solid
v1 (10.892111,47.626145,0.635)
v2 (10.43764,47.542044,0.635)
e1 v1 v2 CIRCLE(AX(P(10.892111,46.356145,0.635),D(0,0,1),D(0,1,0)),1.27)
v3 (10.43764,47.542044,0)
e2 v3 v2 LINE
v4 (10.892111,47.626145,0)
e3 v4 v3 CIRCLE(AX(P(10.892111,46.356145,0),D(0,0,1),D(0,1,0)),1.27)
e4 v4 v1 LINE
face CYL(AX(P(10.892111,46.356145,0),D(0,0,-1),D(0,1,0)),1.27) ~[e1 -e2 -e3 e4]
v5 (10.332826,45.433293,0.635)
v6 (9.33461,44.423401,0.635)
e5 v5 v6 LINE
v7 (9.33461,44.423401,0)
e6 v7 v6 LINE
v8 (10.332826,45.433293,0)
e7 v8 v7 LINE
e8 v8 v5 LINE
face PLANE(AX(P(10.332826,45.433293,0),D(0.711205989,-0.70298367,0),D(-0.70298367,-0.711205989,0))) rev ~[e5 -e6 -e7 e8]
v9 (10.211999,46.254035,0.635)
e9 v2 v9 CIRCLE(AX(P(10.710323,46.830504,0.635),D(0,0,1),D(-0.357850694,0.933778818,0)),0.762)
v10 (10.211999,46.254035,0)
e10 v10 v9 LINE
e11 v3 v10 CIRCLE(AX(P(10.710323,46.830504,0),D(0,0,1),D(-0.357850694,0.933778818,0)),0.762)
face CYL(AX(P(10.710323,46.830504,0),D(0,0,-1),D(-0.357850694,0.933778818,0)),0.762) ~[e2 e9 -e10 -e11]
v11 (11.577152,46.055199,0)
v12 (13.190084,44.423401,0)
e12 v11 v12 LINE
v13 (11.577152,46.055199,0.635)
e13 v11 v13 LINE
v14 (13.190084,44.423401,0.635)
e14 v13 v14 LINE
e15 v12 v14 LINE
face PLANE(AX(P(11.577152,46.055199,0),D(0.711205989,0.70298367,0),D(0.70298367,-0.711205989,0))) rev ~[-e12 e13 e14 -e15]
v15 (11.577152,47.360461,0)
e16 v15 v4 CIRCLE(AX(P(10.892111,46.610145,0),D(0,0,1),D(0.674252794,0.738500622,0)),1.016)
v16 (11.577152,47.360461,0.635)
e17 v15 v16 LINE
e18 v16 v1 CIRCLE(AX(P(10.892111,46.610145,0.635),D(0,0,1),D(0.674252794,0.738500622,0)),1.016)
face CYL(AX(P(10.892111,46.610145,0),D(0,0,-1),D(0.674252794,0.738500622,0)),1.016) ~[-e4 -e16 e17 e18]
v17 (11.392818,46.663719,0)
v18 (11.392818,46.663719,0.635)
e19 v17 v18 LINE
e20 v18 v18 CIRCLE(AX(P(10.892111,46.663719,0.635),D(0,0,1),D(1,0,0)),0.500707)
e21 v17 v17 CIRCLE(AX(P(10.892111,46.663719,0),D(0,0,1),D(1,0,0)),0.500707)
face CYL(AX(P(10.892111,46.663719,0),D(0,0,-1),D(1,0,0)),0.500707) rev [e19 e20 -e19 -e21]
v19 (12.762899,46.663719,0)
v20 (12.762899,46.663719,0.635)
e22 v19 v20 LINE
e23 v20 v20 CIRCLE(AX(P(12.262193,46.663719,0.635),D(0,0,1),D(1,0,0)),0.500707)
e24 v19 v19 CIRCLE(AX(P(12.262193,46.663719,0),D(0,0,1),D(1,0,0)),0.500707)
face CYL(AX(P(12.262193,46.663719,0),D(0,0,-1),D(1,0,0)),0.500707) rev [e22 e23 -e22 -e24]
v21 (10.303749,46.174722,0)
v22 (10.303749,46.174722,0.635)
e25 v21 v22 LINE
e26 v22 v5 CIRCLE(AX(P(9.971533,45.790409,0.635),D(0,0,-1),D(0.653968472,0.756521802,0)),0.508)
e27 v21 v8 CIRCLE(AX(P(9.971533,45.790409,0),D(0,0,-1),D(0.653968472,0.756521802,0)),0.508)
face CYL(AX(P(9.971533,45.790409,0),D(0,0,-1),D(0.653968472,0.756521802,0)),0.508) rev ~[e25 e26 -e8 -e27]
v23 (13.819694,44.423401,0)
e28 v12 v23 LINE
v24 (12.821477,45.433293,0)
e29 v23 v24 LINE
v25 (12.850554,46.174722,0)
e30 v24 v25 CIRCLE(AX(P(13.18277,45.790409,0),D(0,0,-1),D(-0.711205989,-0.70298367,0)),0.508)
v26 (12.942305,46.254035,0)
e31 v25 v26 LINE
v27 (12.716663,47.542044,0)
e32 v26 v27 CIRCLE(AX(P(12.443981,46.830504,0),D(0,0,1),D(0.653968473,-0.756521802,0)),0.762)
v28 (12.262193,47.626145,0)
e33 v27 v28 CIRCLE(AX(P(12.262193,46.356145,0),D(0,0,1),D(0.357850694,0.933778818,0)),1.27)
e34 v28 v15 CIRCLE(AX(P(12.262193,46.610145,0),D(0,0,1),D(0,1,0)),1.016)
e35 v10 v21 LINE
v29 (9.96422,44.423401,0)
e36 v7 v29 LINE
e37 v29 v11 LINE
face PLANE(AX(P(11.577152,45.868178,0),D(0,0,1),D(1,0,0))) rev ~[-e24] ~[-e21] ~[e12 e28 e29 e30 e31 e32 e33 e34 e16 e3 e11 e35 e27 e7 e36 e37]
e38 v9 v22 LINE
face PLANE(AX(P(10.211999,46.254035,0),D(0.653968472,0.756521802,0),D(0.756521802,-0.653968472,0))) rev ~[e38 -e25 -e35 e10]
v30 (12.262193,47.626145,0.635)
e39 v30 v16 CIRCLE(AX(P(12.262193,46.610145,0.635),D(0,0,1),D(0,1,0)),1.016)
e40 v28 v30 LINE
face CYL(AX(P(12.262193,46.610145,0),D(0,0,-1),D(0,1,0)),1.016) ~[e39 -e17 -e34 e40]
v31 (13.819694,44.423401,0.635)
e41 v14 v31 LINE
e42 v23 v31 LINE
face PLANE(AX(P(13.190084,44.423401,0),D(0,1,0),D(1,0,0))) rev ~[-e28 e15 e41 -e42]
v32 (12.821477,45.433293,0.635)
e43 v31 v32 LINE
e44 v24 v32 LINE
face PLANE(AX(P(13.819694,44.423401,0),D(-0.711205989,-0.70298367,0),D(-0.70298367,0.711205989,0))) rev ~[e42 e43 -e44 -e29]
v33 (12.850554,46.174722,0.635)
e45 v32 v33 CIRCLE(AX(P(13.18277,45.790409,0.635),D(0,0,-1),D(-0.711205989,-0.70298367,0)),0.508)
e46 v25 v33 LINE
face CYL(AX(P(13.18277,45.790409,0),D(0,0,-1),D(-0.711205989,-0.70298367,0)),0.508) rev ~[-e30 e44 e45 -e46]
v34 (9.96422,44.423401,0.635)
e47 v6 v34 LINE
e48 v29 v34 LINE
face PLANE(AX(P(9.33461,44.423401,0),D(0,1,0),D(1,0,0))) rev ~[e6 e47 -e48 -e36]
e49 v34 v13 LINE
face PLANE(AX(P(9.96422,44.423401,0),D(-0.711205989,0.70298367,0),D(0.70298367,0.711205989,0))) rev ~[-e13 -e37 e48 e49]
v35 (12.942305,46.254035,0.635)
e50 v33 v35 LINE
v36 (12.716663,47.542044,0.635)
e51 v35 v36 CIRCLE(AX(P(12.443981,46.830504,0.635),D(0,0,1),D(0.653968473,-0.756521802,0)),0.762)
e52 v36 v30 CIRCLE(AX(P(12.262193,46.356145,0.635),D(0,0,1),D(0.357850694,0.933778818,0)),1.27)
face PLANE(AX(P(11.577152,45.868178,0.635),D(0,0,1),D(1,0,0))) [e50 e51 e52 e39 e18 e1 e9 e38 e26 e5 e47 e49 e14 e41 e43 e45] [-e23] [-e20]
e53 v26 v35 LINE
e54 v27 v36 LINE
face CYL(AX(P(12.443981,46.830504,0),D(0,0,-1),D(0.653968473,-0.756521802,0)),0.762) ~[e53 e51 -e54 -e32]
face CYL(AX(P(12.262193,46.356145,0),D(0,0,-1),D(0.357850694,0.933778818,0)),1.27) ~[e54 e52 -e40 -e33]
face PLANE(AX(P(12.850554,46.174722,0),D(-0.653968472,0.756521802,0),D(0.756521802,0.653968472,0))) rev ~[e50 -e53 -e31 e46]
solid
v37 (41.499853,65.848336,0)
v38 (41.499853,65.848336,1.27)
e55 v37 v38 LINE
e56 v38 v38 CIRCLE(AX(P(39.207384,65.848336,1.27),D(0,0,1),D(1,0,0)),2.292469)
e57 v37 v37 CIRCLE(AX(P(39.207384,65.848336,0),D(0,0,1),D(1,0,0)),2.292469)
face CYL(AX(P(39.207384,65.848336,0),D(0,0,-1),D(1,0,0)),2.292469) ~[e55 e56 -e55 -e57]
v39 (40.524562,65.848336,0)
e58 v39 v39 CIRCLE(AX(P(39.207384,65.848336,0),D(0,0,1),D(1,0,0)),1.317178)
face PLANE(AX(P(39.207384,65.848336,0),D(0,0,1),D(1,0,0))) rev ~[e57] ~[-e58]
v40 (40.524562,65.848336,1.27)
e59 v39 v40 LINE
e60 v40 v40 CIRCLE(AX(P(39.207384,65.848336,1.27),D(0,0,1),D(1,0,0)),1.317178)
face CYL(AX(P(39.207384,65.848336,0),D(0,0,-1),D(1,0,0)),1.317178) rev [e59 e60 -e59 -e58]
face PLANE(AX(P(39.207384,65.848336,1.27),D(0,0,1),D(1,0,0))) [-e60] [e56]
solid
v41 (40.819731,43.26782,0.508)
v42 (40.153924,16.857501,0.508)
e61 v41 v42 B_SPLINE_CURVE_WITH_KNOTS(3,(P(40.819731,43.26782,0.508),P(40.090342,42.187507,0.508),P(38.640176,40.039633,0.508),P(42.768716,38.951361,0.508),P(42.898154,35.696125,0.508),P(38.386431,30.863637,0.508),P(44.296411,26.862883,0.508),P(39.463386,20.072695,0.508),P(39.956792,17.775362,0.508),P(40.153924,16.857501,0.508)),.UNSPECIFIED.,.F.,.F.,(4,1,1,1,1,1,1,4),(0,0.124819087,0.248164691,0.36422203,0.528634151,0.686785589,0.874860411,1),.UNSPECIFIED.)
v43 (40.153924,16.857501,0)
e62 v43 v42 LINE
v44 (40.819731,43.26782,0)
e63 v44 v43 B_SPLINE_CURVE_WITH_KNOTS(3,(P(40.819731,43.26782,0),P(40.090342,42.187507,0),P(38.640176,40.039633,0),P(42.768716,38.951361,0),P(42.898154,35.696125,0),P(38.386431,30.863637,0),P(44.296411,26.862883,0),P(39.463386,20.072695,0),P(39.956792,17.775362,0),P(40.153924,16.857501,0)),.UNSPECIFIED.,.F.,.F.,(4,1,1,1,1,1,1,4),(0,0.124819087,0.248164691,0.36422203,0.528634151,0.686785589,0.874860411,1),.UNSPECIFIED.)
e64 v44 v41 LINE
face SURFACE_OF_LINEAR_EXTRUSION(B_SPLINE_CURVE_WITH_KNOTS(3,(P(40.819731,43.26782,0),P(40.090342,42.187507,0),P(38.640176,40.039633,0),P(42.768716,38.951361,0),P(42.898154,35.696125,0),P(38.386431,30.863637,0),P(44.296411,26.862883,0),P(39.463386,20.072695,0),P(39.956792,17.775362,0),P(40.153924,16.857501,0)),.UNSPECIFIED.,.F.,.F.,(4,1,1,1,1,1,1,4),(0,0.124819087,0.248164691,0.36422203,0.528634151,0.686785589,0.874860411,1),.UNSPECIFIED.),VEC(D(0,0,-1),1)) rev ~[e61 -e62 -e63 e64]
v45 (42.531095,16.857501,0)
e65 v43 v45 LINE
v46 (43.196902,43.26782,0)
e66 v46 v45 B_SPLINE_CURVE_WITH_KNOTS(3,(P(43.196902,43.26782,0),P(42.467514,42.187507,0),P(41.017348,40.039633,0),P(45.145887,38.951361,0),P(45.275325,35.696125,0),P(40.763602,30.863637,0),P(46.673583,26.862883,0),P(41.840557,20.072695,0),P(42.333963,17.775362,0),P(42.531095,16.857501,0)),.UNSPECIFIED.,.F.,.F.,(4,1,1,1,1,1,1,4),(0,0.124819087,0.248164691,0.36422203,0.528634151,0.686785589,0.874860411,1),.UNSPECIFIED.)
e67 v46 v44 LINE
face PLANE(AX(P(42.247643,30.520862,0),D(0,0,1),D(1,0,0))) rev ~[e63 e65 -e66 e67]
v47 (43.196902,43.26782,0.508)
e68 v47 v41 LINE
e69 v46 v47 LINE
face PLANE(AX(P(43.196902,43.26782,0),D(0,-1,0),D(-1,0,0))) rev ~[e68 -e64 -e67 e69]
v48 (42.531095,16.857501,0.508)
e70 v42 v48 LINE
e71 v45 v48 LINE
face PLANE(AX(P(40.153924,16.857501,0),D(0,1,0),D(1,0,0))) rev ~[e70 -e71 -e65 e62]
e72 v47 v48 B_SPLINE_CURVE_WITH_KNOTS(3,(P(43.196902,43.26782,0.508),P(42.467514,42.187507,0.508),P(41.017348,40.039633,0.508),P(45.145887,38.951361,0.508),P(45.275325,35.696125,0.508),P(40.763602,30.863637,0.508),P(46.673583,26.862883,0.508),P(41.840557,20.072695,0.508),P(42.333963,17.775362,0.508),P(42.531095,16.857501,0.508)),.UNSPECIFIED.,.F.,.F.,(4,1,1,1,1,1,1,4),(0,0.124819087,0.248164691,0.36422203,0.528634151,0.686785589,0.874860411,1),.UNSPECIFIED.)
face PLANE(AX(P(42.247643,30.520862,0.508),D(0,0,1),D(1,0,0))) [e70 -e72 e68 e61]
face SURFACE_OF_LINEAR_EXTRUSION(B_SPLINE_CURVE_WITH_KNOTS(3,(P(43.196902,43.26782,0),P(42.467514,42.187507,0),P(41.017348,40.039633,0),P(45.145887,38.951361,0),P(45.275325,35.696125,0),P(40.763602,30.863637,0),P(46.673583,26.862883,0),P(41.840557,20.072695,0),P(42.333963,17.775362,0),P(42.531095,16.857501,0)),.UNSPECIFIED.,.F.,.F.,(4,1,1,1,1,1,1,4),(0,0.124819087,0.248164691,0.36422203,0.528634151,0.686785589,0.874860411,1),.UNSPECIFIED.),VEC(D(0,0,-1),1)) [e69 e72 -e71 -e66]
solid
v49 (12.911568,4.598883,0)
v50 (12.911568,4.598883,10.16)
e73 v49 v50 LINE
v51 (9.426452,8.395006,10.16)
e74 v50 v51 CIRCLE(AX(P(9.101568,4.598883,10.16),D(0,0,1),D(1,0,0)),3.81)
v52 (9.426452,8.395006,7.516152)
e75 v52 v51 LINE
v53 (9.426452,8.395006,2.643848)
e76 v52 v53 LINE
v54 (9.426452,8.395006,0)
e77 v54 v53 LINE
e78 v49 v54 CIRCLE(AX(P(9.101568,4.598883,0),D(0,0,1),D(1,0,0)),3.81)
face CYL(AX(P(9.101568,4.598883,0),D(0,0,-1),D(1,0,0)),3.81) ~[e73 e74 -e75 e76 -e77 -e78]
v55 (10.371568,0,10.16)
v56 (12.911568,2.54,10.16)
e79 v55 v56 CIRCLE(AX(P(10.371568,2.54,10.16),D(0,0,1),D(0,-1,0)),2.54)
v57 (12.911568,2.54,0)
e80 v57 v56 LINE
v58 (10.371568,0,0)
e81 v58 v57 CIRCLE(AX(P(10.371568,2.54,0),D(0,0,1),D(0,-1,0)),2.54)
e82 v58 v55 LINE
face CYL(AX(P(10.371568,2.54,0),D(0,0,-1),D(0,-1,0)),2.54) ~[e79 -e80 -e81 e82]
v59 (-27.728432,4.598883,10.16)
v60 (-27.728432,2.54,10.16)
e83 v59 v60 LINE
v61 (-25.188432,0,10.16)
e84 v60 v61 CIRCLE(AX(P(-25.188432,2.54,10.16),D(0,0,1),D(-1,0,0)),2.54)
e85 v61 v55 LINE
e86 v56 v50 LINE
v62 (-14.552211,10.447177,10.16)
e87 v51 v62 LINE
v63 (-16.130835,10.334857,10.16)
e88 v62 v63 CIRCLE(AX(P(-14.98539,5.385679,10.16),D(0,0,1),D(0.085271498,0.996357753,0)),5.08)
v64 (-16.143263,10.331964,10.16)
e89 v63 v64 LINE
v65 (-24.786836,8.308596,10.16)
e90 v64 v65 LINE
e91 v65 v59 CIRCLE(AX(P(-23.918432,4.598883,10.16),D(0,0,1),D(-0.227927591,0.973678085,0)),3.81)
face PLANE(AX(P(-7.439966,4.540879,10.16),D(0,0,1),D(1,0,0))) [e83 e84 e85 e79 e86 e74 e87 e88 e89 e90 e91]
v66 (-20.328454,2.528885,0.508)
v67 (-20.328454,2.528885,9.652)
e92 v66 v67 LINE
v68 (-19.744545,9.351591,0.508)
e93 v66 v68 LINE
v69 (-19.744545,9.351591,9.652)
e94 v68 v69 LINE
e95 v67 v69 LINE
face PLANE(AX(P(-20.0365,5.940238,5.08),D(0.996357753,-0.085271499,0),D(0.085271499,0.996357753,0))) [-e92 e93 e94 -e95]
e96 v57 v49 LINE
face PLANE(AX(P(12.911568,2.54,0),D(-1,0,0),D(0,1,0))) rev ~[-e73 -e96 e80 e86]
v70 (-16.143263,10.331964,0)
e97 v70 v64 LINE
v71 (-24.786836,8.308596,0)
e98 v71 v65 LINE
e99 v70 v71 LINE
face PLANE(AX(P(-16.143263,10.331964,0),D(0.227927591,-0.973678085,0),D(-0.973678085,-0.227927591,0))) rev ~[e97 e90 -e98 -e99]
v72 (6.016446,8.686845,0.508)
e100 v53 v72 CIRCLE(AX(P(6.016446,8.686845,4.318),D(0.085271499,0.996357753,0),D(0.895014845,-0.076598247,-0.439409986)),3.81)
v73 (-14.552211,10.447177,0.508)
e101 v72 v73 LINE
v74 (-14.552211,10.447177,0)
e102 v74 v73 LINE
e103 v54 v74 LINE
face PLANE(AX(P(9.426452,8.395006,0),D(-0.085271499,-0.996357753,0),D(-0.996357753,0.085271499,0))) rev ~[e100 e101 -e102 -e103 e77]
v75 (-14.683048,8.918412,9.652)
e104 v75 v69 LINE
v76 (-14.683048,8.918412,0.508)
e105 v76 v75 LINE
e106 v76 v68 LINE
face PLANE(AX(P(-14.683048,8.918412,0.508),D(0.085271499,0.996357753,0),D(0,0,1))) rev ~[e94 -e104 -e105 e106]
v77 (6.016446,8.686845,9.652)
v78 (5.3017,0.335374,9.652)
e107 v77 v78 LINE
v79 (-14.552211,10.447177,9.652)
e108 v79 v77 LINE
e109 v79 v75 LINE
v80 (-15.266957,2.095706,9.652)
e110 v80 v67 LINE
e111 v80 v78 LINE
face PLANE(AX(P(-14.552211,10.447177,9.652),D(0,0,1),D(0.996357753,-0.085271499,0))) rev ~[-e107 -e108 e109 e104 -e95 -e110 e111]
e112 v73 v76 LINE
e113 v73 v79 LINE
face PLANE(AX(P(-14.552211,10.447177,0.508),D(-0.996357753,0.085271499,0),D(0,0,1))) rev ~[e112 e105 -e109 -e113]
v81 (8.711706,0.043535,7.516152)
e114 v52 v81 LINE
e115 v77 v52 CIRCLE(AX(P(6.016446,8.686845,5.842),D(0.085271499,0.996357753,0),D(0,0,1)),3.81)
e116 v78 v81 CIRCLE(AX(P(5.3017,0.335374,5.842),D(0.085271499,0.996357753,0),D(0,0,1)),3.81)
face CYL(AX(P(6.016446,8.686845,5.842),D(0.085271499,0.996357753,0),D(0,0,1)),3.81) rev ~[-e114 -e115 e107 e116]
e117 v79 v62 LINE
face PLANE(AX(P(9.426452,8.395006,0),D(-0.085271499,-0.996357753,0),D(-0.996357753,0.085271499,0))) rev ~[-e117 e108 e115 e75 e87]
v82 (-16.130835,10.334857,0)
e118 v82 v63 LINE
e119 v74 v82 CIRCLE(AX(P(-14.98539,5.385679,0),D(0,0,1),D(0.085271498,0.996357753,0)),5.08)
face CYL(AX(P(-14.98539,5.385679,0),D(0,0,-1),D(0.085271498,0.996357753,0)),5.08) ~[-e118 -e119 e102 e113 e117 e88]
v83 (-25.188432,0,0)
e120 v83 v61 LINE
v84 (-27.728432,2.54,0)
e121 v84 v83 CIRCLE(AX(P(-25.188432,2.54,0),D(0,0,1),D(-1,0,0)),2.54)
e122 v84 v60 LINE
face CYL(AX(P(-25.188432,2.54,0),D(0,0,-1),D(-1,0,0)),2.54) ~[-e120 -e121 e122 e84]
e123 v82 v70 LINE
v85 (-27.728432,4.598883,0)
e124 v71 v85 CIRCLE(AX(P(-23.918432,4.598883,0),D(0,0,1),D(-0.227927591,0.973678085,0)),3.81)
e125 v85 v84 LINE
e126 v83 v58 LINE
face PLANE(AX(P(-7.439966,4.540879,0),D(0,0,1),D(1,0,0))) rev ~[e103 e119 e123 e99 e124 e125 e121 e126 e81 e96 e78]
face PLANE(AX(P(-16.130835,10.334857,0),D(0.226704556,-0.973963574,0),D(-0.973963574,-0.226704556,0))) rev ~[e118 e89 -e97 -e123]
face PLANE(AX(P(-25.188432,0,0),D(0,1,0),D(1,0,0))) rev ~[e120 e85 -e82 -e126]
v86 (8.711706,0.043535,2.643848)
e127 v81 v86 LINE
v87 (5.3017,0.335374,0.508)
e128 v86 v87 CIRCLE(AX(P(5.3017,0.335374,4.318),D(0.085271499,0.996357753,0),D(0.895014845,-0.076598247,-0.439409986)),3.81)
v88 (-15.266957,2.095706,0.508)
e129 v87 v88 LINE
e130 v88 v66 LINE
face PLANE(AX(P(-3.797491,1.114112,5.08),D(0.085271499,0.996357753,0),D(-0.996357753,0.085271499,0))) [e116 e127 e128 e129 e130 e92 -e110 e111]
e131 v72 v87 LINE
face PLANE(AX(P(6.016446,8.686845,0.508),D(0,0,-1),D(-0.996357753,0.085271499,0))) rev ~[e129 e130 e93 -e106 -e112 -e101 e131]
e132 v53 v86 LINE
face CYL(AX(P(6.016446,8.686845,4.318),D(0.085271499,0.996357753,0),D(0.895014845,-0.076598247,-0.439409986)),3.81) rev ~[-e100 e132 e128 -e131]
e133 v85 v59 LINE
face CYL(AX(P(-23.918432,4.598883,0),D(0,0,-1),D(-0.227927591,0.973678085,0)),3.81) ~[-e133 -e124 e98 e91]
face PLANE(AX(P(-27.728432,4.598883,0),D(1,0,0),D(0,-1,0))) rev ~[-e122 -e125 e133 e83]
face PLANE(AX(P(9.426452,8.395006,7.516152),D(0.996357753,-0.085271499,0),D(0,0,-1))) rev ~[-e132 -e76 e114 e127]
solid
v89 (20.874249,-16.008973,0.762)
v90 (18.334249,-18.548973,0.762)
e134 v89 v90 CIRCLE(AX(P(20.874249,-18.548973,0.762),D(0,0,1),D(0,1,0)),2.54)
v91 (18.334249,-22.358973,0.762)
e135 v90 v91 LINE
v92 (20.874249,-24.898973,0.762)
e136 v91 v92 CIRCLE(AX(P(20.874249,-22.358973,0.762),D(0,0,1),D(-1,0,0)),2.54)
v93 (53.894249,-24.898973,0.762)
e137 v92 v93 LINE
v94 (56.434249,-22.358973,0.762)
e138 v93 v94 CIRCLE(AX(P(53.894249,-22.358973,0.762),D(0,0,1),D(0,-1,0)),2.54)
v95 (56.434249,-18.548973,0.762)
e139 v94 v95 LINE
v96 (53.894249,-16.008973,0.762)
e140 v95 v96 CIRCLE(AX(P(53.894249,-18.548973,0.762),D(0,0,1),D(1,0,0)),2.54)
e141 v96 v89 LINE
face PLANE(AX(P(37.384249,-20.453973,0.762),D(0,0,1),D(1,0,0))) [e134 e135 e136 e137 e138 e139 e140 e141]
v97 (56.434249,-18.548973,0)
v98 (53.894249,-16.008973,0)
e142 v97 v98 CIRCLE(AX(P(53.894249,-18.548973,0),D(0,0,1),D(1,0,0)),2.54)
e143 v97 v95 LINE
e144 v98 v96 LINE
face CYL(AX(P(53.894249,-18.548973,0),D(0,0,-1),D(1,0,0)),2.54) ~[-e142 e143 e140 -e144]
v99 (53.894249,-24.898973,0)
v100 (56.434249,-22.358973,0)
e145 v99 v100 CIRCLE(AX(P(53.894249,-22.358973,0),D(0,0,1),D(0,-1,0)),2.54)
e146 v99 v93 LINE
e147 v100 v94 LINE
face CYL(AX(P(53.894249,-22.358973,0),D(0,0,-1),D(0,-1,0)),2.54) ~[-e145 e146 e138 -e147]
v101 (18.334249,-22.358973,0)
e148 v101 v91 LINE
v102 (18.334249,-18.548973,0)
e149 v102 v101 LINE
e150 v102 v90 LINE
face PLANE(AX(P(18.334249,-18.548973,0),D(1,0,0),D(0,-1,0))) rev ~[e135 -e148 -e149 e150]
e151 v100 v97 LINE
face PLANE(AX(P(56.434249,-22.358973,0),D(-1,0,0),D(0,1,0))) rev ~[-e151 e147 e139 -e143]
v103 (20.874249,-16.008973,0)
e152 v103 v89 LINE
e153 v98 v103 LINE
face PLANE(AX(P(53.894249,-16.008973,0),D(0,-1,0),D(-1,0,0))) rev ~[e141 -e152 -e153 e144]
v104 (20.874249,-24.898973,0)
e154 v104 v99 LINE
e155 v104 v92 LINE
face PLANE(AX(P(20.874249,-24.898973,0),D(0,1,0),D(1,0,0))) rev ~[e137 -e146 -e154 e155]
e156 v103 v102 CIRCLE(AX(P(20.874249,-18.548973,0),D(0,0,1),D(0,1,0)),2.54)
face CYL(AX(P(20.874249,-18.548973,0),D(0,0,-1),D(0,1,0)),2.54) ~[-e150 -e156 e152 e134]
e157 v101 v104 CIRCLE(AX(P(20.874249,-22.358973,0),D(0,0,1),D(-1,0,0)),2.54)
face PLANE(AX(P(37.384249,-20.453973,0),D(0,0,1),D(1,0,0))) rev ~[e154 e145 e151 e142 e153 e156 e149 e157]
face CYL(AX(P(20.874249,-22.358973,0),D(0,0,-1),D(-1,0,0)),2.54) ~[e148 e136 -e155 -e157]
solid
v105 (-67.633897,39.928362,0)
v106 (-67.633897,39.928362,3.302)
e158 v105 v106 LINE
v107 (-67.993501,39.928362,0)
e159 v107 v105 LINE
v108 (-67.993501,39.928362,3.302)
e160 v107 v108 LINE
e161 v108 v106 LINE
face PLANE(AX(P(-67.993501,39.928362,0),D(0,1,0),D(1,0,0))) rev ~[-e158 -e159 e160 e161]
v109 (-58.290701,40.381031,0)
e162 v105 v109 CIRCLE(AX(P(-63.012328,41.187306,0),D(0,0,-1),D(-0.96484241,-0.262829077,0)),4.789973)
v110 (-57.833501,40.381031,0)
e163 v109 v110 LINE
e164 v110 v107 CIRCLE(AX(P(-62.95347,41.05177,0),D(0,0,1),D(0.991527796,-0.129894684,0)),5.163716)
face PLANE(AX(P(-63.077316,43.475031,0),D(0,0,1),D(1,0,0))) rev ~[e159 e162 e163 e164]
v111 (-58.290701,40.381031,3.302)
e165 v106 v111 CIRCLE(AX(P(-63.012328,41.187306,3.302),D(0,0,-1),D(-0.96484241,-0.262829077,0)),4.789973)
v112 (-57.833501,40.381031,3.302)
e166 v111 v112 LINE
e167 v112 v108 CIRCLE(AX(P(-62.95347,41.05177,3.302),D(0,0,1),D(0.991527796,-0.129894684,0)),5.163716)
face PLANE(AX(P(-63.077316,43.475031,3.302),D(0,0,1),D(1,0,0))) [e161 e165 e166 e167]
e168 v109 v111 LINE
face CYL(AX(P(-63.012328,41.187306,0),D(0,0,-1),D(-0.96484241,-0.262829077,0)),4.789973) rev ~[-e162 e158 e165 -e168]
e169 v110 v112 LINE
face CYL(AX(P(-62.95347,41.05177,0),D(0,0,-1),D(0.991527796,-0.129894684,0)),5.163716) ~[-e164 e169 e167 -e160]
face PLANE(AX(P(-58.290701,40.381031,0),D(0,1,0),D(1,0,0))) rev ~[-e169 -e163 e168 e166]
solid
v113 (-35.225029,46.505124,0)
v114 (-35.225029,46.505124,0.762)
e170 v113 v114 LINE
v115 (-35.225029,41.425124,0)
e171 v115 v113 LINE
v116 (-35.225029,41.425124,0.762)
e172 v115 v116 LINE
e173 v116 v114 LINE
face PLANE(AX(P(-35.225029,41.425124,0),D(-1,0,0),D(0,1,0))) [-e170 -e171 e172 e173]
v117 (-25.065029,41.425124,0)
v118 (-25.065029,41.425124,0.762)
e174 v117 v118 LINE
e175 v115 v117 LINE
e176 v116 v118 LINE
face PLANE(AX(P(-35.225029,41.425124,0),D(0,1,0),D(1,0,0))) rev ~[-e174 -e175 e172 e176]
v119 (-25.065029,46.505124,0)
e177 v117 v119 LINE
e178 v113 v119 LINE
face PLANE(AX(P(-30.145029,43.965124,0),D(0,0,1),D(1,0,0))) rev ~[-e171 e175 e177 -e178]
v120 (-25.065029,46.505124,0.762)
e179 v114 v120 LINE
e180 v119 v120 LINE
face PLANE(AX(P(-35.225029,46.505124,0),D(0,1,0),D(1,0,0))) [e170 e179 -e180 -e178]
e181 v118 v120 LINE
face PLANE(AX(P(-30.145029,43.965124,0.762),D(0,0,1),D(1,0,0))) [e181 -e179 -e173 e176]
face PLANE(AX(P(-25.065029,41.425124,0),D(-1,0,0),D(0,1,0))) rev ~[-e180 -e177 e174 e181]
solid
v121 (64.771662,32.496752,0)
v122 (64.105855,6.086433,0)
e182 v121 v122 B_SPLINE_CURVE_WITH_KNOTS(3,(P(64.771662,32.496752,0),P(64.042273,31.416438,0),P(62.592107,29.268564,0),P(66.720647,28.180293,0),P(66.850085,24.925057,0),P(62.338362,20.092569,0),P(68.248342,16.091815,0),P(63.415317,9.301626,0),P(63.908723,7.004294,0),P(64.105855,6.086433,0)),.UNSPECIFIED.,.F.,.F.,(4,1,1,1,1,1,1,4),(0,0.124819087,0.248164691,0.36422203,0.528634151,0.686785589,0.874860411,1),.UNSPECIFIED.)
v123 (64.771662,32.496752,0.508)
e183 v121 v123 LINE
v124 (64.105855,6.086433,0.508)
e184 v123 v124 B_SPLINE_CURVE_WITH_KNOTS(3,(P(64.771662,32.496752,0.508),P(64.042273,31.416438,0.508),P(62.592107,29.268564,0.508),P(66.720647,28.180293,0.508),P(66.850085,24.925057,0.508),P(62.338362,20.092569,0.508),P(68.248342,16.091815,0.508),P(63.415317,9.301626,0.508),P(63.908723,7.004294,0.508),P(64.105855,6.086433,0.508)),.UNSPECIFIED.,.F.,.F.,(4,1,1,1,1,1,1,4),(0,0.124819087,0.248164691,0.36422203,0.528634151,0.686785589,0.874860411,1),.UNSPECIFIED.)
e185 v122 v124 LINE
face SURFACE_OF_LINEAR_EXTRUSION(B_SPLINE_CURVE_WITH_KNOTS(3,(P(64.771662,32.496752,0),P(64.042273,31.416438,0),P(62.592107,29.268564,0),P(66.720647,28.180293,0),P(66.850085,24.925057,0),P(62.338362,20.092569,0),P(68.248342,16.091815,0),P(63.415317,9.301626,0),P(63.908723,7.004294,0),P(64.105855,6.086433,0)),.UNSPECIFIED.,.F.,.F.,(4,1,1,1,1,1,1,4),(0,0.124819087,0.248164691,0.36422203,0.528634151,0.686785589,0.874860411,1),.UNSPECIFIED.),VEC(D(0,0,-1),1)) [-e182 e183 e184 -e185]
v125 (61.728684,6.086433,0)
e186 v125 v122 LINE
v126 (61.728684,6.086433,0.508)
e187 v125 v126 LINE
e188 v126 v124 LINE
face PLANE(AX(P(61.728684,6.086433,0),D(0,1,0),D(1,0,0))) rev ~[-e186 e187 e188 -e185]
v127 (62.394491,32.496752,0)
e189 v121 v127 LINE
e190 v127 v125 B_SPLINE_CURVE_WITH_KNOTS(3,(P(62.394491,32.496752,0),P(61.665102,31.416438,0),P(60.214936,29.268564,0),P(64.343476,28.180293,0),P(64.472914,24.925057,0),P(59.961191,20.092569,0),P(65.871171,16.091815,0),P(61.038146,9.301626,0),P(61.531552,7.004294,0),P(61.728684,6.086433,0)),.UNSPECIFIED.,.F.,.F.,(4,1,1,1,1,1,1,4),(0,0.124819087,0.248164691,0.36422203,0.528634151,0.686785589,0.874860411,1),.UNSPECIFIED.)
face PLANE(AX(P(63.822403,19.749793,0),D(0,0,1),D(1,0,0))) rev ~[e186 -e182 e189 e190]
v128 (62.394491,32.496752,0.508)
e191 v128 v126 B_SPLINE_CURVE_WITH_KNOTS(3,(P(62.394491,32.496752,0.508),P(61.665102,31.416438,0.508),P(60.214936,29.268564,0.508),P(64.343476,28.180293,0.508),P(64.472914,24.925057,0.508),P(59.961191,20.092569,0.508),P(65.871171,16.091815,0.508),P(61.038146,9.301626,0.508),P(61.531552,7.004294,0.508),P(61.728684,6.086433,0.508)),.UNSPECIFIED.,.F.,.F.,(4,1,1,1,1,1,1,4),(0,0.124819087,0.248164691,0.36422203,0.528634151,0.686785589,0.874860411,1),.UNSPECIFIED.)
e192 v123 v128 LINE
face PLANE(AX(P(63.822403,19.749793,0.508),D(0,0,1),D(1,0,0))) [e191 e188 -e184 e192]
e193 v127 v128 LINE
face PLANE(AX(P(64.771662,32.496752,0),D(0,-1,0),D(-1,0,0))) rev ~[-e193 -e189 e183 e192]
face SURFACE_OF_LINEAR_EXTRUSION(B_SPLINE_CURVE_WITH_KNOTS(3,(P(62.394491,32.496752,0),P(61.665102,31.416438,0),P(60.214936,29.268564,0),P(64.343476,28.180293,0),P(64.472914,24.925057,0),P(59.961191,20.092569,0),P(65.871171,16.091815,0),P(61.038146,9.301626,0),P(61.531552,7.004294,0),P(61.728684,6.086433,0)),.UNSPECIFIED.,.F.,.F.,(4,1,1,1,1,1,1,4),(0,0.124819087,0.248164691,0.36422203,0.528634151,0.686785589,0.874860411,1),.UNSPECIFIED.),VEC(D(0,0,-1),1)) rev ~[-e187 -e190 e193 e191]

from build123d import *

# Parameters (mm, degrees)
F1_DEPTH  = 10.16
F3_DEPTH  = 8.382
F4_W      = 6.8476469303
F4_H      = 9.144
F5_DEPTH  = 5.08
F6_R      = 0.5007069219
F7_DEPTH  = 0.635
F9_DEPTH  = 3.302
F11_DEPTH = 0.508
F12_DEPTH = 0.508
F14_DEPTH = 0.762
F15_R     = 2.2924687411
F15_R_2   = 1.3171780173
F16_DEPTH = 1.27
F17_W     = 10.16
F17_H     = 5.08
F18_DEPTH = 0.762


# Not quite as in the source:
# - ends of sketch curves that miss each other by under 0.0002 mm in the source are joined


with BuildPart() as f1:
    # F0 (on Top) → F1 (new body)
    with BuildSketch(Plane.XY):
        with BuildLine():
            ThreePointArc((-24.7868363938, 8.3085960276), (-26.9037898481, 6.9661045557), (-27.7284322733, 4.5988825234))
            Line((-27.7284322733, 4.5988825234), (-27.7284322733, 2.54))
            ThreePointArc((-27.7284322733, 2.54), (-26.9844834975, 0.7439487758), (-25.1884322733, 0))
            Line((-25.1884322733, 0), (10.3715677267, 0))
            ThreePointArc((10.3715677267, 0), (12.1676189509, 0.7439487758), (12.9115677267, 2.54))
            Line((12.9115677267, 2.54), (12.9115677267, 4.5988825234))
            ThreePointArc((12.9115677267, 4.5988825234), (11.9081590401, 7.1755364), (9.4264521363, 8.3950055615))
            Line((9.4264521363, 8.3950055615), (-14.5522111368, 10.4471766271))
            ThreePointArc((-14.5522111368, 10.4471766271), (-15.345923724, 10.4528693603), (-16.1308346038, 10.3348566959))
            Line((-16.1308346038, 10.3348566959), (-16.1432625103, 10.3319639152))
            Line((-16.1432625103, 10.3319639152), (-24.7868363938, 8.3085960276))
        make_face()
    extrude(amount=F1_DEPTH)

    # F2 (on face) → F3 (cut)
    with BuildSketch(Plane(origin=(0.7817892721, 9.1348435917, 0), x_dir=(-0.9963577528, 0.0852714986, 0), z_dir=(0.0852714986, 0.9963577528, 0))):
        with BuildLine():
            Line((15.3900547932, 0.508), (15.3900547932, 9.652))
            Line((15.3900547932, 9.652), (-5.253791913, 9.652))
            ThreePointArc((-5.253791913, 9.652), (-7.2709161912, 9.0742298257), (-8.6762639624, 7.5161520454))
            Line((-8.6762639624, 7.5161520454), (-8.6762639624, 2.6438479546))
            ThreePointArc((-8.6762639624, 2.6438479546), (-7.2709161912, 1.0857701743), (-5.253791913, 0.508))
            Line((-5.253791913, 0.508), (15.3900547932, 0.508))
        make_face()
    extrude(amount=-F3_DEPTH, mode=Mode.SUBTRACT)

    # F4 (on face) → F5 (cut)
    with BuildSketch(Plane(origin=(-15.334000409, 1.3123330354, 0), x_dir=(0.0852714986, 0.9963577528, 0), z_dir=(0.9963577528, -0.0852714986, 0))):
        with Locations((4.2100600409, 5.08)):
            Rectangle(F4_W, F4_H)
    extrude(amount=-F5_DEPTH, mode=Mode.SUBTRACT)


with BuildPart() as f7:
    # F6 (on Top) → F7 (new body)
    with BuildSketch(Plane.XY):
        with BuildLine():
            Line((10.332825936, 45.4332928986), (9.3346098438, 44.4234013557))
            Line((9.3346098438, 44.4234013557), (9.9642197122, 44.4234013557))
            Line((9.9642197122, 44.4234013557), (11.5771517158, 46.0551987213))
            Line((11.5771517158, 46.0551987213), (13.1900837193, 44.4234013557))
            Line((13.1900837193, 44.4234013557), (13.8196935877, 44.4234013557))
            Line((13.8196935877, 44.4234013557), (12.8214774955, 45.4332928986))
            ThreePointArc((12.8214774955, 45.4332928986), (12.6751603345, 45.8103155683), (12.850554154, 46.1747216785))
            Line((12.850554154, 46.1747216785), (12.9423046835, 46.2540345991))
            ThreePointArc((12.9423046835, 46.2540345991), (13.1945501477, 46.9619938139), (12.7166629365, 47.5420436715))
            ThreePointArc((12.7166629365, 47.5420436715), (12.4932857662, 47.6049423658), (12.2621925548, 47.6261445728))
            ThreePointArc((12.2621925548, 47.6261445728), (11.8948137983, 47.5573978913), (11.5771517158, 47.3604612052))
            ThreePointArc((11.5771517158, 47.3604612052), (11.2594896332, 47.5573978913), (10.8921108767, 47.6261445728))
            ThreePointArc((10.8921108767, 47.6261445728), (10.6610176653, 47.6049423658), (10.4376404951, 47.5420436715))
            ThreePointArc((10.4376404951, 47.5420436715), (9.9597532838, 46.9619938139), (10.211998748, 46.2540345991))
            Line((10.211998748, 46.2540345991), (10.3037492775, 46.1747216785))
            ThreePointArc((10.3037492775, 46.1747216785), (10.4791430971, 45.8103155683), (10.332825936, 45.4332928986))
        make_face()
        with Locations((10.8921108767, 46.6637188027)):
            Circle(F6_R, mode=Mode.SUBTRACT)
        with Locations((12.2621925548, 46.6637188027)):
            Circle(F6_R, mode=Mode.SUBTRACT)
    extrude(amount=F7_DEPTH)


with BuildPart() as f9:
    # F8 (on Top) → F9 (new body)
    with BuildSketch(Plane.XY):
        with BuildLine():
            Line((-58.2907013595, 40.3810308359), (-57.8335013595, 40.3810308359))
            ThreePointArc((-57.8335013595, 40.3810308359), (-63.1833058582, 46.2103688914), (-67.9935013595, 39.9283620799))
            Line((-67.9935013595, 39.9283620799), (-67.6338970661, 39.9283620799))
            ThreePointArc((-67.6338970661, 39.9283620799), (-63.2441257914, 45.9716671324), (-58.2907013595, 40.3810308359))
        make_face()
    extrude(amount=F9_DEPTH)


with BuildPart() as f11:
    # F10 (on Top) → F11 (new body)
    with BuildSketch(Plane.XY):
        with BuildLine():
            Line((43.196901679, 43.2678200305), (40.8197306097, 43.2678200305))
            add(Edge.make_bspline(
                [(40.8197306097, 43.2678200305), (40.0903424352, 42.1875066472), (38.6401764766, 40.0396329251), (42.7687162109, 38.9513613115), (42.8981542778, 35.6961252098), (38.3864305973, 30.863637368), (44.2964114797, 26.8628834056), (39.4633863407, 20.0726945137), (39.9567922733, 17.775361978), (40.1539243758, 16.8575011194)],
                knots=[0, 0, 0, 0, 0.1248190868, 0.2481646906, 0.3642220301, 0.5286341512, 0.6867855887, 0.8748604114, 1, 1, 1, 1], degree=3))
            Line((40.1539243758, 16.8575011194), (42.5310954452, 16.8575011194))
            add(Edge.make_bspline(
                [(43.196901679, 43.2678200305), (42.4675135046, 42.1875066472), (41.017347546, 40.0396329251), (45.1458872803, 38.9513613115), (45.2753253472, 35.6961252098), (40.7636016667, 30.863637368), (46.6735825491, 26.8628834056), (41.8405574101, 20.0726945137), (42.3339633426, 17.775361978), (42.5310954452, 16.8575011194)],
                knots=[0, 0, 0, 0, 0.1248190868, 0.2481646906, 0.3642220301, 0.5286341512, 0.6867855887, 0.8748604114, 1, 1, 1, 1], degree=3))
        make_face()
    extrude(amount=F11_DEPTH)

    # F10 (on Top) → F12 (join)
    with BuildSketch(Plane.XY):
        with BuildLine():
            Line((43.196901679, 43.2678200305), (40.8197306097, 43.2678200305))
            add(Edge.make_bspline(
                [(40.8197306097, 43.2678200305), (40.0903424352, 42.1875066472), (38.6401764766, 40.0396329251), (42.7687162109, 38.9513613115), (42.8981542778, 35.6961252098), (38.3864305973, 30.863637368), (44.2964114797, 26.8628834056), (39.4633863407, 20.0726945137), (39.9567922733, 17.775361978), (40.1539243758, 16.8575011194)],
                knots=[0, 0, 0, 0, 0.1248190868, 0.2481646906, 0.3642220301, 0.5286341512, 0.6867855887, 0.8748604114, 1, 1, 1, 1], degree=3))
            Line((40.1539243758, 16.8575011194), (42.5310954452, 16.8575011194))
            add(Edge.make_bspline(
                [(43.196901679, 43.2678200305), (42.4675135046, 42.1875066472), (41.017347546, 40.0396329251), (45.1458872803, 38.9513613115), (45.2753253472, 35.6961252098), (40.7636016667, 30.863637368), (46.6735825491, 26.8628834056), (41.8405574101, 20.0726945137), (42.3339633426, 17.775361978), (42.5310954452, 16.8575011194)],
                knots=[0, 0, 0, 0, 0.1248190868, 0.2481646906, 0.3642220301, 0.5286341512, 0.6867855887, 0.8748604114, 1, 1, 1, 1], degree=3))
        make_face()
    extrude(amount=F12_DEPTH)


with BuildPart() as f12:
    # F10 (on Top) → F12, piece 2 (new body)
    with BuildSketch(Plane.XY):
        with BuildLine():
            Line((64.7716616045, 32.4967515558), (62.3944905351, 32.4967515558))
            add(Edge.make_bspline(
                [(62.3944905351, 32.4967515558), (61.6651023607, 31.4164381725), (60.2149364021, 29.2685644504), (64.3434761363, 28.1802928369), (64.4729142032, 24.9250567351), (59.9611905228, 20.0925688934), (65.8711714052, 16.091814931), (61.0381462662, 9.301626039), (61.5315521987, 7.0042935034), (61.7286843012, 6.0864326447)],
                knots=[0, 0, 0, 0, 0.1248190868, 0.2481646906, 0.3642220301, 0.5286341512, 0.6867855887, 0.8748604114, 1, 1, 1, 1], degree=3))
            Line((61.7286843012, 6.0864326447), (64.1058553706, 6.0864326447))
            add(Edge.make_bspline(
                [(64.7716616045, 32.4967515558), (64.0422734301, 31.4164381725), (62.5921074715, 29.2685644504), (66.7206472057, 28.1802928369), (66.8500852726, 24.9250567351), (62.3383615921, 20.0925688934), (68.2483424746, 16.091814931), (63.4153173355, 9.301626039), (63.9087232681, 7.0042935034), (64.1058553706, 6.0864326447)],
                knots=[0, 0, 0, 0, 0.1248190868, 0.2481646906, 0.3642220301, 0.5286341512, 0.6867855887, 0.8748604114, 1, 1, 1, 1], degree=3))
        make_face()
    extrude(amount=F12_DEPTH)


with BuildPart() as f14:
    # F13 (on Top) → F14 (new body)
    with BuildSketch(Plane.XY):
        with BuildLine():
            Line((53.89424927, -16.0089726677), (20.87424927, -16.0089726677))
            ThreePointArc((20.87424927, -16.0089726677), (19.0781980457, -16.7529214435), (18.33424927, -18.5489726677))
            Line((18.33424927, -18.5489726677), (18.33424927, -22.3589726677))
            ThreePointArc((18.33424927, -22.3589726677), (19.0781980457, -24.1550238919), (20.87424927, -24.8989726677))
            Line((20.87424927, -24.8989726677), (53.89424927, -24.8989726677))
            ThreePointArc((53.89424927, -24.8989726677), (55.6903004942, -24.1550238919), (56.43424927, -22.3589726677))
            Line((56.43424927, -22.3589726677), (56.43424927, -18.5489726677))
            ThreePointArc((56.43424927, -18.5489726677), (55.6903004942, -16.7529214435), (53.89424927, -16.0089726677))
        make_face()
    extrude(amount=F14_DEPTH)


with BuildPart() as f16:
    # F15 (on Top) → F16 (new body)
    with BuildSketch(Plane.XY):
        with Locations((39.2073839903, 65.8483356237)):
            Circle(F15_R)
        with Locations((39.2073839903, 65.8483356237)):
            Circle(F15_R_2, mode=Mode.SUBTRACT)
    extrude(amount=F16_DEPTH)


with BuildPart() as f18:
    # F17 (on Top) → F18 (new body)
    with BuildSketch(Plane.XY):
        with Locations((-30.1450286061, 43.965123704)):
            Rectangle(F17_W, F17_H)
    extrude(amount=F18_DEPTH)


solid = Compound([f1.part, f7.part, f9.part, f11.part, f12.part, f14.part, f16.part, f18.part])
